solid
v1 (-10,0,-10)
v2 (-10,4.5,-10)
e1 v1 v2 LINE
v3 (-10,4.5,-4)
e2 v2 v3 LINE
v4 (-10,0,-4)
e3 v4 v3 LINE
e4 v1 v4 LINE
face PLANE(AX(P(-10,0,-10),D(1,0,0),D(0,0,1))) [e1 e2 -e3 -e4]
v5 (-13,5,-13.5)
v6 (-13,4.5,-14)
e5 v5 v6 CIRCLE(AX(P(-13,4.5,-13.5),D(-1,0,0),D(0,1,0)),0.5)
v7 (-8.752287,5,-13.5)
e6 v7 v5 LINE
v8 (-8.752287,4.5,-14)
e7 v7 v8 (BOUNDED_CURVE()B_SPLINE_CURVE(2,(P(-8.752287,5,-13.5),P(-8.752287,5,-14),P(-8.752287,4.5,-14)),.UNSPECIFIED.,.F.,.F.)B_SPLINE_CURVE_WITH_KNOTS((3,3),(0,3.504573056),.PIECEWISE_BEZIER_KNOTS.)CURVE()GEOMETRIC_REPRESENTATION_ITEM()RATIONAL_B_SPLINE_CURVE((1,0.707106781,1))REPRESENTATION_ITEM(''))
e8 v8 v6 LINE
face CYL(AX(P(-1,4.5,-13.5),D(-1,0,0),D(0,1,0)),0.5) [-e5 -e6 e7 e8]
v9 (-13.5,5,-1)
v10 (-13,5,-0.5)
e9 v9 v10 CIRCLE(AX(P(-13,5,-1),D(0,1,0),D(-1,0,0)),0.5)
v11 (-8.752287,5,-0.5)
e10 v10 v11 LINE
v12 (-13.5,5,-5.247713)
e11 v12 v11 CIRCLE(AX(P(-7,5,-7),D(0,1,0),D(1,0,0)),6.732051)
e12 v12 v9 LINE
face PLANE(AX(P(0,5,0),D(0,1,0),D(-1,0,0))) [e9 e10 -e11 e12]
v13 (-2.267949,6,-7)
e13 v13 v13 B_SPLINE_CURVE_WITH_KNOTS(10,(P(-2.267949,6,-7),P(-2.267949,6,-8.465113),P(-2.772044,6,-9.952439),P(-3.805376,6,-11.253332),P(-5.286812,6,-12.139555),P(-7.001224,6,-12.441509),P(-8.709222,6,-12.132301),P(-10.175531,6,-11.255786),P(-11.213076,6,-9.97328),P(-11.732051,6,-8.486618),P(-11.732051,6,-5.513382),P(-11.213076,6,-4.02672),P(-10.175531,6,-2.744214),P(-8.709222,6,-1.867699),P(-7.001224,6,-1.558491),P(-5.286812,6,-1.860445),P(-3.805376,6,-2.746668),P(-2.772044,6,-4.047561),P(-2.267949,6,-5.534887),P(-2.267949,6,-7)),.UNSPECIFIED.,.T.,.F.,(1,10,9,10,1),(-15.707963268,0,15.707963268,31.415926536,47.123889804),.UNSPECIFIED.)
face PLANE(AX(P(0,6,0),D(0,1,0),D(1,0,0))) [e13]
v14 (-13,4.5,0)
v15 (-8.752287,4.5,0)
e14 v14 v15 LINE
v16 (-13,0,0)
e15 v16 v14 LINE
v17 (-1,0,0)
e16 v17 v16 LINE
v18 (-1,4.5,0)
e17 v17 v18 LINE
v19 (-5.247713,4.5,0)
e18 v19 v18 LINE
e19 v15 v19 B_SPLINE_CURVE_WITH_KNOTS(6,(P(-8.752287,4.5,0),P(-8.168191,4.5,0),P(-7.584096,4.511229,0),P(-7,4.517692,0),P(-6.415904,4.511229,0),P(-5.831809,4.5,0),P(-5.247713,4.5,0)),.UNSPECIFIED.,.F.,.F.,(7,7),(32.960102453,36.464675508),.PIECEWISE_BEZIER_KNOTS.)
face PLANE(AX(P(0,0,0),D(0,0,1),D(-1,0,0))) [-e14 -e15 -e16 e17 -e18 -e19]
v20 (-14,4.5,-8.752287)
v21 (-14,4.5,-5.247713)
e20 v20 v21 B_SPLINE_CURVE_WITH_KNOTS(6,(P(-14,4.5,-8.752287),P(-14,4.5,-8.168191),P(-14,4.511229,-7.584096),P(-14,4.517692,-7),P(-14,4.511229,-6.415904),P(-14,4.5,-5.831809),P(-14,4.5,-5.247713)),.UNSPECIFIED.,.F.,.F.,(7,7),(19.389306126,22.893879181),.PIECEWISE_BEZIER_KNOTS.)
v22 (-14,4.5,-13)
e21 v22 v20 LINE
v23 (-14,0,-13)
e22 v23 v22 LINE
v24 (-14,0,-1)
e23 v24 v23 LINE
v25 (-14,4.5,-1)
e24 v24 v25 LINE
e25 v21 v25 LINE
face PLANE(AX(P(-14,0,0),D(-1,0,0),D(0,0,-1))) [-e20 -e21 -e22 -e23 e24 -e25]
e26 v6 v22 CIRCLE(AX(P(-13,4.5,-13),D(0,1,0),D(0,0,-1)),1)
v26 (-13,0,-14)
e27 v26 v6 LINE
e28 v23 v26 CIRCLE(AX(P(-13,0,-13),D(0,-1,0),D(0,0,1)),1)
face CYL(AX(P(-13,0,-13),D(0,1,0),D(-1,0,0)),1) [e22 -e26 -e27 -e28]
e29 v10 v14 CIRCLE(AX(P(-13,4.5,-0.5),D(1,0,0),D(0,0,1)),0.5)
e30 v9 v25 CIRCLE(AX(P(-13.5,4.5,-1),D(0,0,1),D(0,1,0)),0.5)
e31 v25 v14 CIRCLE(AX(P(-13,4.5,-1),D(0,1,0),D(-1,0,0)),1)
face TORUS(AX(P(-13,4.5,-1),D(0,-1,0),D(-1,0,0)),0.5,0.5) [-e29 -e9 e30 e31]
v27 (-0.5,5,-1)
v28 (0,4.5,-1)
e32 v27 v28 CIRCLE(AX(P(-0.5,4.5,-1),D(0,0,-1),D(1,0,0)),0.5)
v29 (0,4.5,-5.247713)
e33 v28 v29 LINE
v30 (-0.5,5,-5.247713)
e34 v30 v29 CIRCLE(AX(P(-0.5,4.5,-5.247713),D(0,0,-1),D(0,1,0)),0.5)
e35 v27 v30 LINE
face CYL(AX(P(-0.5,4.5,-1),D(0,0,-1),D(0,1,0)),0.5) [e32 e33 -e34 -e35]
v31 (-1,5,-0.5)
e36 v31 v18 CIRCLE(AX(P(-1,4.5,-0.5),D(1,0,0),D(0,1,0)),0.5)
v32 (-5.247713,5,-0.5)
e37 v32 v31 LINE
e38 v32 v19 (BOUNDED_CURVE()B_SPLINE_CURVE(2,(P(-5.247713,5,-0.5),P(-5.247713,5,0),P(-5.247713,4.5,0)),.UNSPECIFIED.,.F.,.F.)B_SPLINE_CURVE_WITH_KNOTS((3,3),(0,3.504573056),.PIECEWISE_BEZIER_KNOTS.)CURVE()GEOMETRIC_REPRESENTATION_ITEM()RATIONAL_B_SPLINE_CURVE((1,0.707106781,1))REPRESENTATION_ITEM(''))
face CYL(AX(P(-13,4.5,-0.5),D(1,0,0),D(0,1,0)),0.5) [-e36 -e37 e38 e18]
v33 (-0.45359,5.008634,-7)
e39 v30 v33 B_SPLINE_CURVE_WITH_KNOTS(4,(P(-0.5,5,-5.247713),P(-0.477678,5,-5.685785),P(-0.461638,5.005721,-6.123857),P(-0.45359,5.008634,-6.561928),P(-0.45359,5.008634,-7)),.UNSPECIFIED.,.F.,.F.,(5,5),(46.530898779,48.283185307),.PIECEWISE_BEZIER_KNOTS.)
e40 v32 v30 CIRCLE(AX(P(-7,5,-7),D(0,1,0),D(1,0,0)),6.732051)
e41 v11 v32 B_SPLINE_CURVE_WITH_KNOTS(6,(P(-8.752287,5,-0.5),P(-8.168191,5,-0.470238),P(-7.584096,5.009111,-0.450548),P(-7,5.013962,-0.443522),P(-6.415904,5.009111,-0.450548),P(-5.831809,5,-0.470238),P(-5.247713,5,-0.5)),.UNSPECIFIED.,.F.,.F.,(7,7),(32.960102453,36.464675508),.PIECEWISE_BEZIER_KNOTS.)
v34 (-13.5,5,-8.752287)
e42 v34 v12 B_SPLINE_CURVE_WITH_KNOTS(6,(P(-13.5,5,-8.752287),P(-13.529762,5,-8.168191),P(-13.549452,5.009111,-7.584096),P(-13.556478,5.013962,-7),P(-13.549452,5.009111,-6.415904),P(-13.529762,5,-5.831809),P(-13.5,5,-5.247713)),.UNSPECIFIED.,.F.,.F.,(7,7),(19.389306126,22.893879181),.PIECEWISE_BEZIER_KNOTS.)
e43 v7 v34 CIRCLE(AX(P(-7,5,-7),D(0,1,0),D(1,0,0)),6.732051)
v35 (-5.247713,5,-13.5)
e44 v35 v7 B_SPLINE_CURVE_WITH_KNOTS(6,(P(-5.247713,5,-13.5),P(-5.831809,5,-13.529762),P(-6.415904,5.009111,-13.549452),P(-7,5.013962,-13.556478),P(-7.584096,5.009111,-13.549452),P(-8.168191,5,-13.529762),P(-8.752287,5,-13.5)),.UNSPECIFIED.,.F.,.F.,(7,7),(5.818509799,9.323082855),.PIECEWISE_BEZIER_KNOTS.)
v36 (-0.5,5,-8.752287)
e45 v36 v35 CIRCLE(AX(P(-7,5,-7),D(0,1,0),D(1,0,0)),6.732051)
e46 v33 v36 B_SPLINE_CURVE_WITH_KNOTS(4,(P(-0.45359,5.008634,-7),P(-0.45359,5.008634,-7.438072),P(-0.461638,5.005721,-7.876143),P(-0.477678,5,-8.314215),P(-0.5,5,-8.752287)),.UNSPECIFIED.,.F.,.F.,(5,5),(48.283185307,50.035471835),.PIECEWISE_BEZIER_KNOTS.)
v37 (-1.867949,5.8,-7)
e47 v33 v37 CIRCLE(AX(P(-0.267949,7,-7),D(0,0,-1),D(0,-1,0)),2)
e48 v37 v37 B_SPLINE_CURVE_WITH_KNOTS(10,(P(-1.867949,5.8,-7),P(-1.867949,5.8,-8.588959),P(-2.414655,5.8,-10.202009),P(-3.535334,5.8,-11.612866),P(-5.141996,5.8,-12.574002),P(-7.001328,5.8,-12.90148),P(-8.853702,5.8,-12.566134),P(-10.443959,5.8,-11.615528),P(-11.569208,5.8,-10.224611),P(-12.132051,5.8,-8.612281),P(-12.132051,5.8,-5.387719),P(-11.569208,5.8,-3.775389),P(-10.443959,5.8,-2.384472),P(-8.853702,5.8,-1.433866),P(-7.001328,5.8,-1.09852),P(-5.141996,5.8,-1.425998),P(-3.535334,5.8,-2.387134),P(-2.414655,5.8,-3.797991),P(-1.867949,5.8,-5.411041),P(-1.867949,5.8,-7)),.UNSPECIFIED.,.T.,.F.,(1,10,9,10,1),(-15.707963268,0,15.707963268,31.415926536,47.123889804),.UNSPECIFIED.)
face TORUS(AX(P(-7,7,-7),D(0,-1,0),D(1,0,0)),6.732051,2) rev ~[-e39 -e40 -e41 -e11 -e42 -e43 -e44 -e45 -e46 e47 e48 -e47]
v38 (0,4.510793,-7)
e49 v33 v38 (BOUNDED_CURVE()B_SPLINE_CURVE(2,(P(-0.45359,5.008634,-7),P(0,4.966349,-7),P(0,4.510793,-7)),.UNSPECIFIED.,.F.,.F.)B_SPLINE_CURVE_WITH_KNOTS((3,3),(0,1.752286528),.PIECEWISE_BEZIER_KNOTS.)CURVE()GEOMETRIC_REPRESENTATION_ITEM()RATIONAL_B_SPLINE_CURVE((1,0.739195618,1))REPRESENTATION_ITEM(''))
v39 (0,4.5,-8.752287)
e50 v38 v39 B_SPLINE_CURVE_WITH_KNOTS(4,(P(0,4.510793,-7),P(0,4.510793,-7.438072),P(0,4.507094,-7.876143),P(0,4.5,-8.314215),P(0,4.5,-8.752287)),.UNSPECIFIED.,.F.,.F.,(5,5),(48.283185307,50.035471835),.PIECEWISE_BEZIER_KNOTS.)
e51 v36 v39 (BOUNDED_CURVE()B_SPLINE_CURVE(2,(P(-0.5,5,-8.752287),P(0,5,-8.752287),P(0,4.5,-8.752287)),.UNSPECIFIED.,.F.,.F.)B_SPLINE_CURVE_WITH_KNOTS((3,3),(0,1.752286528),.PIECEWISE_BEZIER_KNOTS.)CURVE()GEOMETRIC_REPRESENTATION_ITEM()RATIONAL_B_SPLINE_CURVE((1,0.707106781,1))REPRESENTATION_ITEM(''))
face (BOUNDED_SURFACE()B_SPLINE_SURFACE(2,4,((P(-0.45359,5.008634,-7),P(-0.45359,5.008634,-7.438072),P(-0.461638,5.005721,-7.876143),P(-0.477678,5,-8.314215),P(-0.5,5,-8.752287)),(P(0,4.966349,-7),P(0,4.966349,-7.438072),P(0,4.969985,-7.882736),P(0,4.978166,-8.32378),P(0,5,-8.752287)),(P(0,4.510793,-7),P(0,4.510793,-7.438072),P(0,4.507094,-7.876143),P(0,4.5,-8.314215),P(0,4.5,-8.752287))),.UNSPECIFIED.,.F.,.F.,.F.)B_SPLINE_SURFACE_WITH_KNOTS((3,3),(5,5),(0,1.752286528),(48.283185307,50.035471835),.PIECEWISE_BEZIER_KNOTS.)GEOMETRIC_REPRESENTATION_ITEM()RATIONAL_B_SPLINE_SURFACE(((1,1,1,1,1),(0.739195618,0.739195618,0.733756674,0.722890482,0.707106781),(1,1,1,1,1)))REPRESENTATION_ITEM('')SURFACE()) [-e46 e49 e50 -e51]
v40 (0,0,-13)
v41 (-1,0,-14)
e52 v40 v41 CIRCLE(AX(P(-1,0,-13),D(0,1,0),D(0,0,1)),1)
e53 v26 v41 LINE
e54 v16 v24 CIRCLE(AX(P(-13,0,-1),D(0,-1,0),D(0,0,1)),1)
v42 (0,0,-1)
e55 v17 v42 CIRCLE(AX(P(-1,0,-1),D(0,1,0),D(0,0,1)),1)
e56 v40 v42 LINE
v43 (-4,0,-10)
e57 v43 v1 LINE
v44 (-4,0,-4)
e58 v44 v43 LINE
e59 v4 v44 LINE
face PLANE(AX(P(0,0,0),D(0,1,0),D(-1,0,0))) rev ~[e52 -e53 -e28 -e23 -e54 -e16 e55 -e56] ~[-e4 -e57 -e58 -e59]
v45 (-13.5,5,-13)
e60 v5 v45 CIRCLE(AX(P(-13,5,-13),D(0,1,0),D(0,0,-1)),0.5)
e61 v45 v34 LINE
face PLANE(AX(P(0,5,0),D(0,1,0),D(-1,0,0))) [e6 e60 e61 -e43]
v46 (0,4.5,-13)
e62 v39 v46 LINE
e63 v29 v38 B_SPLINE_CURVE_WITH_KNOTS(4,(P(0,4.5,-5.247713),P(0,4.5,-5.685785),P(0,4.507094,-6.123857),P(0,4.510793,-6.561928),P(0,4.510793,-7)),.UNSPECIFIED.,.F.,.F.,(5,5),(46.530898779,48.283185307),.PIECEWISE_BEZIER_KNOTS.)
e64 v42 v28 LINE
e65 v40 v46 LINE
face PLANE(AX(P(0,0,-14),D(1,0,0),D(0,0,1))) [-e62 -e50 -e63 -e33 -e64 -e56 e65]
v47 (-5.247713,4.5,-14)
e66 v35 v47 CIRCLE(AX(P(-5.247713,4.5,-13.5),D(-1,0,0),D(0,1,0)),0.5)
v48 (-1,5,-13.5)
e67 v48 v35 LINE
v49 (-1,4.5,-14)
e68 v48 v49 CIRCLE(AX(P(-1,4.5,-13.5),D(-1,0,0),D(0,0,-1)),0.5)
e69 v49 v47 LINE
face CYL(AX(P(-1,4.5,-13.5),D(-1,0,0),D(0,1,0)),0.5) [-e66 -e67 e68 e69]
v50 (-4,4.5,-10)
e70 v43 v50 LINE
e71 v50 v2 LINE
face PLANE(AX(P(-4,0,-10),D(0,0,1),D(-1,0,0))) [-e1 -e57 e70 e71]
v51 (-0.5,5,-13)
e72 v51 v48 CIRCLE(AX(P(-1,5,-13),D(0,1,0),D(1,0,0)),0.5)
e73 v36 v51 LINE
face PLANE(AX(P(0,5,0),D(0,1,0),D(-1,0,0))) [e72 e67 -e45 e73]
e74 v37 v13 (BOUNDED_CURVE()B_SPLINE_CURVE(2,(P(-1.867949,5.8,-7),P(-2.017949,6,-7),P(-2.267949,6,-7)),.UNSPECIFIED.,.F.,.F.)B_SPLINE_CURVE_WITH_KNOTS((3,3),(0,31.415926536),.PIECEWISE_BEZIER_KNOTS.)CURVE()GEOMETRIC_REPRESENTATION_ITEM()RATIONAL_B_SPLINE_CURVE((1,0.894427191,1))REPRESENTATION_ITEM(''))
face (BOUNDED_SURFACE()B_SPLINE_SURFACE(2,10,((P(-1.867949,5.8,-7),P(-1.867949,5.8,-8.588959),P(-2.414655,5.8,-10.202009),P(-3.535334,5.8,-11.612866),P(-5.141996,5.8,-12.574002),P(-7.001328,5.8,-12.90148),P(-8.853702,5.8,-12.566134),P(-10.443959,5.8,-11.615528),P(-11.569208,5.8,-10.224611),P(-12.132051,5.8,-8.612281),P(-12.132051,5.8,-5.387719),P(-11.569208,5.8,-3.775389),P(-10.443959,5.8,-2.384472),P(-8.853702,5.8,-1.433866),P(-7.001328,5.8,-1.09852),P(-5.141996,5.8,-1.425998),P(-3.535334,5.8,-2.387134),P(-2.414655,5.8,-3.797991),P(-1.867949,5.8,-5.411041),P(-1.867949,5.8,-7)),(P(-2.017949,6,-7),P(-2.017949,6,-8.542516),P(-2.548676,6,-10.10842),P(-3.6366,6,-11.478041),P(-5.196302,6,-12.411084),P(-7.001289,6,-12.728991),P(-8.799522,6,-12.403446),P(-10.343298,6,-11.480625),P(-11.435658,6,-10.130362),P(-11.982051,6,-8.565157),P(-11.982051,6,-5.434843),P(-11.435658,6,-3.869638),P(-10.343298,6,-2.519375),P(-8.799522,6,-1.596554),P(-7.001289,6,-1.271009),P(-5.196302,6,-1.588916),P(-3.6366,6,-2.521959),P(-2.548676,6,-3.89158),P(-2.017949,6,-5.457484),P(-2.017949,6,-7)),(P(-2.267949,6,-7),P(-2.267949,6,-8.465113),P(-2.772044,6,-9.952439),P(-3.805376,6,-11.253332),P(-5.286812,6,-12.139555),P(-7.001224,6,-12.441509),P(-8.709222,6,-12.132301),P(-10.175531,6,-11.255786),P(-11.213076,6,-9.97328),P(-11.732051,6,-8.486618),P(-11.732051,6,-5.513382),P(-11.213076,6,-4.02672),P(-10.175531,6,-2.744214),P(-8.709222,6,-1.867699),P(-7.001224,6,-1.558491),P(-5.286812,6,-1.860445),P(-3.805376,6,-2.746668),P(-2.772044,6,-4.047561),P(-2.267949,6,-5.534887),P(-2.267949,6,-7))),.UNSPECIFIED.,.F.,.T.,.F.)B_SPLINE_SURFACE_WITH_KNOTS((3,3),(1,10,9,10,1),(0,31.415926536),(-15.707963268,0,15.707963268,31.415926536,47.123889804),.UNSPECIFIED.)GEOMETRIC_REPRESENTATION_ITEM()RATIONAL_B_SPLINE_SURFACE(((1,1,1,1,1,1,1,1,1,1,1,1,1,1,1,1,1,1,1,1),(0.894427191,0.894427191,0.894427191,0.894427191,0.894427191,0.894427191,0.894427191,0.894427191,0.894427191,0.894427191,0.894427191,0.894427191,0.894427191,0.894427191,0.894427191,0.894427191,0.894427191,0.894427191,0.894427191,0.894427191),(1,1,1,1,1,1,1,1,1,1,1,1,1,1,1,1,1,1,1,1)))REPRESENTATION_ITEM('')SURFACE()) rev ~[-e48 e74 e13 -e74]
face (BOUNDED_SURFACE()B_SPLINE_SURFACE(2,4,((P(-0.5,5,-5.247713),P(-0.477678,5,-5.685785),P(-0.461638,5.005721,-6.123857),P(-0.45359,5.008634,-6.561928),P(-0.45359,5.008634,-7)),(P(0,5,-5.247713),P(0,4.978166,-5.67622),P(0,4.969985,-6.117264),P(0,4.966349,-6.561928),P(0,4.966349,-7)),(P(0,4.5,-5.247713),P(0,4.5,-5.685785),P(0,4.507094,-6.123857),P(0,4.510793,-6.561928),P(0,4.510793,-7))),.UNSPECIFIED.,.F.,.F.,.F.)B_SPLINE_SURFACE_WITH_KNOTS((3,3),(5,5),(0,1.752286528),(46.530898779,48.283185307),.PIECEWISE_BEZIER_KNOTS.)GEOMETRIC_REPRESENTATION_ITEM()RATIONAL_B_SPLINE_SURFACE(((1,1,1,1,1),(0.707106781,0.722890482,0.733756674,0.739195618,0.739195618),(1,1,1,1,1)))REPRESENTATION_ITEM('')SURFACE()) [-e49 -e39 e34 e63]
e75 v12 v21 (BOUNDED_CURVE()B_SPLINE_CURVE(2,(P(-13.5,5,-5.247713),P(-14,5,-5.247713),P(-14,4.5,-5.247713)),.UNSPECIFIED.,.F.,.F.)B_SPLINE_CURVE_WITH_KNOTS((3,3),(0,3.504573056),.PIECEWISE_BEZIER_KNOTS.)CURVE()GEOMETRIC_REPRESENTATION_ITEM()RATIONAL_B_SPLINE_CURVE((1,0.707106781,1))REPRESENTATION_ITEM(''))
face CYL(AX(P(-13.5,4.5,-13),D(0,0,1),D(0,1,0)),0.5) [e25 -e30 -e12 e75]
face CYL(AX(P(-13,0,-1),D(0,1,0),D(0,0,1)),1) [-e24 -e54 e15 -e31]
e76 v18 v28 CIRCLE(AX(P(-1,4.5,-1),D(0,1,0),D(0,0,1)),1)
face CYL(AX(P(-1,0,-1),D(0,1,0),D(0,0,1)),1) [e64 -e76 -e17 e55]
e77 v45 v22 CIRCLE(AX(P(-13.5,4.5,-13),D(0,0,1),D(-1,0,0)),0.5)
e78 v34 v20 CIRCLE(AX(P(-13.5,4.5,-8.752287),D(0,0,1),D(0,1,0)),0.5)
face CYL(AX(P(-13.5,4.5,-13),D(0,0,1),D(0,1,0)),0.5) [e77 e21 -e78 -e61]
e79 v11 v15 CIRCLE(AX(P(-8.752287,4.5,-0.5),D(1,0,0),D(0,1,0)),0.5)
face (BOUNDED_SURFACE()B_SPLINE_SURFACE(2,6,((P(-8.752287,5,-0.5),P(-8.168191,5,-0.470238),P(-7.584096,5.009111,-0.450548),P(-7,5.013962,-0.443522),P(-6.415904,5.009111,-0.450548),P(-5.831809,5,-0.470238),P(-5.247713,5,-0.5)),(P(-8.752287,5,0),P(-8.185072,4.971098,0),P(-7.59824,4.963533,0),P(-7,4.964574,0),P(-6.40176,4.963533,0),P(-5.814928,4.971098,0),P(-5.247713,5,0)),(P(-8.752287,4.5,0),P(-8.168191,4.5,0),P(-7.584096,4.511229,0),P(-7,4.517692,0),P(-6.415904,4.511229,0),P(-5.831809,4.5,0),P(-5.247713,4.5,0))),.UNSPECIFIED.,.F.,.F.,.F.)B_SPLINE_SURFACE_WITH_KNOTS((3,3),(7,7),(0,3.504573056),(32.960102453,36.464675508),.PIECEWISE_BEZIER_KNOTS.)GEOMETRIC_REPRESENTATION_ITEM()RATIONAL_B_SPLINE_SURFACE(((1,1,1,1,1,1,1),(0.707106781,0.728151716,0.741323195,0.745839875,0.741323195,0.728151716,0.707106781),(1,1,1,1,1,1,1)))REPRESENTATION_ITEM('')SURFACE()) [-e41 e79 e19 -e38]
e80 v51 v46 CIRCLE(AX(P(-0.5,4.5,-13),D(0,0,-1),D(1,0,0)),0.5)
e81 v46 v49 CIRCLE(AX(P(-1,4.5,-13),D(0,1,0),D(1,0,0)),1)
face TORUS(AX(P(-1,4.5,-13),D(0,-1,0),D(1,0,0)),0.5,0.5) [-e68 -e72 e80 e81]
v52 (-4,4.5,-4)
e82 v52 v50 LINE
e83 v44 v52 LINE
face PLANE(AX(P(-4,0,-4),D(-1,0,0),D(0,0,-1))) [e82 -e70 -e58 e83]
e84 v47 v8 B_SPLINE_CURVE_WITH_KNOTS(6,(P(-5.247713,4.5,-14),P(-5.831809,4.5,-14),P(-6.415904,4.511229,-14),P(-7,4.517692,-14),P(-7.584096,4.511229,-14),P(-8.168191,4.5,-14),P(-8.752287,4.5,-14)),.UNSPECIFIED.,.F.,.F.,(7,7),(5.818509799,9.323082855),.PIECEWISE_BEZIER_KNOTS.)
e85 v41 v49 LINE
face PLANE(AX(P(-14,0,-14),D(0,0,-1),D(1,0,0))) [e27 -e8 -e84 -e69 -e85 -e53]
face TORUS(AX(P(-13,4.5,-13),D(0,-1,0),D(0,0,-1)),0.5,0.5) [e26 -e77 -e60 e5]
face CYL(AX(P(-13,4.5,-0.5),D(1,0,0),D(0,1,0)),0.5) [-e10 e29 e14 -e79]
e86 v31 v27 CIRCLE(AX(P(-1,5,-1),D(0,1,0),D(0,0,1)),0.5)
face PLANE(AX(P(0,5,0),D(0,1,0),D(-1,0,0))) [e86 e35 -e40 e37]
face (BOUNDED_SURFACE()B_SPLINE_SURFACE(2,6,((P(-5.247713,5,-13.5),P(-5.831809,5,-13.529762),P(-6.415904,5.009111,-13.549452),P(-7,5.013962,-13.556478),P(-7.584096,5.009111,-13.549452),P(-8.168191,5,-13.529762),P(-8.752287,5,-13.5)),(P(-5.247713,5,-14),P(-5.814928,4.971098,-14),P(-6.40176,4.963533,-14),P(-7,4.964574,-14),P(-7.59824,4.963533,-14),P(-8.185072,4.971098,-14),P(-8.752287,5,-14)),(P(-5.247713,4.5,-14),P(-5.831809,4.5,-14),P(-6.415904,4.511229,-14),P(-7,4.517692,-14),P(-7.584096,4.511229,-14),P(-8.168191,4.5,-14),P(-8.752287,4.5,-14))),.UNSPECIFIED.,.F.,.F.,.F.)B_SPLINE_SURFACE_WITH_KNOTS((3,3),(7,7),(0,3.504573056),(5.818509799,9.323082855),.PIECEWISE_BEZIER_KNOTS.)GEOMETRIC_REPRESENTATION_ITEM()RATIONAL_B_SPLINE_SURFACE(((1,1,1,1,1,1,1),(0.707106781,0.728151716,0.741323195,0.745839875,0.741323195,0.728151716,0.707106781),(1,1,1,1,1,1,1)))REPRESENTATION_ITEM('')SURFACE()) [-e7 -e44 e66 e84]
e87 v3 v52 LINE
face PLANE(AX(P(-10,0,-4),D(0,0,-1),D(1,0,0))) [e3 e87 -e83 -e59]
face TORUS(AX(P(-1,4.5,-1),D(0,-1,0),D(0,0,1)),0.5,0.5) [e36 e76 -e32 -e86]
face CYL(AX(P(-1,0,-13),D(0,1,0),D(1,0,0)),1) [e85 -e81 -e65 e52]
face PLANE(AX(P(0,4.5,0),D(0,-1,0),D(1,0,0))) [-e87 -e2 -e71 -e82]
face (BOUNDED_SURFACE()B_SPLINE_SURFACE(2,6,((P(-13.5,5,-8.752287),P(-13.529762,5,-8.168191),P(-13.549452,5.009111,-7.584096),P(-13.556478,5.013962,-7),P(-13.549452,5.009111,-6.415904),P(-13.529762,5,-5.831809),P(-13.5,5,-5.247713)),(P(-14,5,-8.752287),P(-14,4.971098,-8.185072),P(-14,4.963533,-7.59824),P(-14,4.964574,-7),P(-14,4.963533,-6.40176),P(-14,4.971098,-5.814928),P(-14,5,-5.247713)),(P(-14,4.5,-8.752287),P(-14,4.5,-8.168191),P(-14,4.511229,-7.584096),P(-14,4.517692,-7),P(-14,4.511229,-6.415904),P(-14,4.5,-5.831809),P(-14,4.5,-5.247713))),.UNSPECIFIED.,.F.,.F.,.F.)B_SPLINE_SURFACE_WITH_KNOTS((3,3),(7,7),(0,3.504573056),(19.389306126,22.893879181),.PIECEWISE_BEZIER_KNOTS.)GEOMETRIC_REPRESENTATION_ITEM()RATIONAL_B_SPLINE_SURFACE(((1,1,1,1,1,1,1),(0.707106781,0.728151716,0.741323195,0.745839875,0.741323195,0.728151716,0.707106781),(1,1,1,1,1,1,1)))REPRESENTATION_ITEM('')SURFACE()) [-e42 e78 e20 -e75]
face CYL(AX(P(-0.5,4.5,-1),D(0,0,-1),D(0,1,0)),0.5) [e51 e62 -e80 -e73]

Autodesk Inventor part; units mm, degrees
ref_plane "YZ Plane" through (0, 0, 0) normal (1, 0, 0) x (0, 1, 0)
ref_plane "XZ Plane" through (0, 0, 0) normal (0, 1, 0) x (-1, 0, 0)
ref_plane "XY Plane" through (0, 0, 0) normal (0, 0, 1) x (1, 0, 0)
sketch "Sketch5" plane through (0, 0, 0) normal (0, 1, 0) x (-1, 0, 0)
  line L0 (0, 0) -> (14, 0)
  line L1 (14, 0) -> (14, -14)
  line L2 (14, -14) -> (0, -14)
  line L3 (0, -14) -> (0, 0)
  dimension "d3" = 14
  dimension "d4" = 14
extrude "Extrusion1" add sketch "Sketch5" along normal blind 5
sketch "Sketch6" plane through (0, 5, 0) normal (0, 1, 0) x (1, 0, 0)
  circle A0 centre (-7, 7) radius 5
  line L0 (0, 0) -> (0, 14) projected
  line L1 (0, 14) -> (-14, 14) projected
  dimension "d7" = 10
  dimension "d8" = 7
  dimension "d9" = 7
extrude "Extrusion2" add sketch "Sketch6" along normal blind 1
fillet "Fillet1" radius 2 1 edges at (-12, 5, -7)
fillet "Fillet2" radius 1 4 edges at (-14, 2.5, 0) (0, 2.5, 0) (-14, 2.5, -14) (0, 2.5, -14)
fillet "Fillet3" radius 0.5 9 edges at (-12, 6, -7) (-0.2929, 5, -13.7071) (-7, 5, -14) (-13.7071, 5, -13.7071) (-14, 5, -7) (-13.7071, 5, -0.2929) (-7, 5, 0) (-0.2929, 5, -0.2929) (0, 5, -7)
ref_plane "Work Plane2" through (-7, 0, -1) normal (1, 0, 0) x (0, 0, -1)
sketch "Sketch25" plane through (0, 0, 0) normal (0, -1, 0) x (1, 0, 0)
  line L0 (-4, -10) -> (-10, -10)
  line L1 (-10, -10) -> (-10, -4)
  line L2 (-10, -4) -> (-4, -4)
  line L3 (-4, -4) -> (-4, -10)
  line L4 (-1, -14) -> (-13, -14) projected
  line L5 (0, -1) -> (0, -13) projected
  point P0 (0, 0)
  dimension "d47" = 6
  dimension "d48" = 6
  dimension "d49" = 4
  dimension "d50" = 4
extrude "Extrusion6" cut sketch "Sketch25" against normal blind 4.5
properties part number "Small_Button"
